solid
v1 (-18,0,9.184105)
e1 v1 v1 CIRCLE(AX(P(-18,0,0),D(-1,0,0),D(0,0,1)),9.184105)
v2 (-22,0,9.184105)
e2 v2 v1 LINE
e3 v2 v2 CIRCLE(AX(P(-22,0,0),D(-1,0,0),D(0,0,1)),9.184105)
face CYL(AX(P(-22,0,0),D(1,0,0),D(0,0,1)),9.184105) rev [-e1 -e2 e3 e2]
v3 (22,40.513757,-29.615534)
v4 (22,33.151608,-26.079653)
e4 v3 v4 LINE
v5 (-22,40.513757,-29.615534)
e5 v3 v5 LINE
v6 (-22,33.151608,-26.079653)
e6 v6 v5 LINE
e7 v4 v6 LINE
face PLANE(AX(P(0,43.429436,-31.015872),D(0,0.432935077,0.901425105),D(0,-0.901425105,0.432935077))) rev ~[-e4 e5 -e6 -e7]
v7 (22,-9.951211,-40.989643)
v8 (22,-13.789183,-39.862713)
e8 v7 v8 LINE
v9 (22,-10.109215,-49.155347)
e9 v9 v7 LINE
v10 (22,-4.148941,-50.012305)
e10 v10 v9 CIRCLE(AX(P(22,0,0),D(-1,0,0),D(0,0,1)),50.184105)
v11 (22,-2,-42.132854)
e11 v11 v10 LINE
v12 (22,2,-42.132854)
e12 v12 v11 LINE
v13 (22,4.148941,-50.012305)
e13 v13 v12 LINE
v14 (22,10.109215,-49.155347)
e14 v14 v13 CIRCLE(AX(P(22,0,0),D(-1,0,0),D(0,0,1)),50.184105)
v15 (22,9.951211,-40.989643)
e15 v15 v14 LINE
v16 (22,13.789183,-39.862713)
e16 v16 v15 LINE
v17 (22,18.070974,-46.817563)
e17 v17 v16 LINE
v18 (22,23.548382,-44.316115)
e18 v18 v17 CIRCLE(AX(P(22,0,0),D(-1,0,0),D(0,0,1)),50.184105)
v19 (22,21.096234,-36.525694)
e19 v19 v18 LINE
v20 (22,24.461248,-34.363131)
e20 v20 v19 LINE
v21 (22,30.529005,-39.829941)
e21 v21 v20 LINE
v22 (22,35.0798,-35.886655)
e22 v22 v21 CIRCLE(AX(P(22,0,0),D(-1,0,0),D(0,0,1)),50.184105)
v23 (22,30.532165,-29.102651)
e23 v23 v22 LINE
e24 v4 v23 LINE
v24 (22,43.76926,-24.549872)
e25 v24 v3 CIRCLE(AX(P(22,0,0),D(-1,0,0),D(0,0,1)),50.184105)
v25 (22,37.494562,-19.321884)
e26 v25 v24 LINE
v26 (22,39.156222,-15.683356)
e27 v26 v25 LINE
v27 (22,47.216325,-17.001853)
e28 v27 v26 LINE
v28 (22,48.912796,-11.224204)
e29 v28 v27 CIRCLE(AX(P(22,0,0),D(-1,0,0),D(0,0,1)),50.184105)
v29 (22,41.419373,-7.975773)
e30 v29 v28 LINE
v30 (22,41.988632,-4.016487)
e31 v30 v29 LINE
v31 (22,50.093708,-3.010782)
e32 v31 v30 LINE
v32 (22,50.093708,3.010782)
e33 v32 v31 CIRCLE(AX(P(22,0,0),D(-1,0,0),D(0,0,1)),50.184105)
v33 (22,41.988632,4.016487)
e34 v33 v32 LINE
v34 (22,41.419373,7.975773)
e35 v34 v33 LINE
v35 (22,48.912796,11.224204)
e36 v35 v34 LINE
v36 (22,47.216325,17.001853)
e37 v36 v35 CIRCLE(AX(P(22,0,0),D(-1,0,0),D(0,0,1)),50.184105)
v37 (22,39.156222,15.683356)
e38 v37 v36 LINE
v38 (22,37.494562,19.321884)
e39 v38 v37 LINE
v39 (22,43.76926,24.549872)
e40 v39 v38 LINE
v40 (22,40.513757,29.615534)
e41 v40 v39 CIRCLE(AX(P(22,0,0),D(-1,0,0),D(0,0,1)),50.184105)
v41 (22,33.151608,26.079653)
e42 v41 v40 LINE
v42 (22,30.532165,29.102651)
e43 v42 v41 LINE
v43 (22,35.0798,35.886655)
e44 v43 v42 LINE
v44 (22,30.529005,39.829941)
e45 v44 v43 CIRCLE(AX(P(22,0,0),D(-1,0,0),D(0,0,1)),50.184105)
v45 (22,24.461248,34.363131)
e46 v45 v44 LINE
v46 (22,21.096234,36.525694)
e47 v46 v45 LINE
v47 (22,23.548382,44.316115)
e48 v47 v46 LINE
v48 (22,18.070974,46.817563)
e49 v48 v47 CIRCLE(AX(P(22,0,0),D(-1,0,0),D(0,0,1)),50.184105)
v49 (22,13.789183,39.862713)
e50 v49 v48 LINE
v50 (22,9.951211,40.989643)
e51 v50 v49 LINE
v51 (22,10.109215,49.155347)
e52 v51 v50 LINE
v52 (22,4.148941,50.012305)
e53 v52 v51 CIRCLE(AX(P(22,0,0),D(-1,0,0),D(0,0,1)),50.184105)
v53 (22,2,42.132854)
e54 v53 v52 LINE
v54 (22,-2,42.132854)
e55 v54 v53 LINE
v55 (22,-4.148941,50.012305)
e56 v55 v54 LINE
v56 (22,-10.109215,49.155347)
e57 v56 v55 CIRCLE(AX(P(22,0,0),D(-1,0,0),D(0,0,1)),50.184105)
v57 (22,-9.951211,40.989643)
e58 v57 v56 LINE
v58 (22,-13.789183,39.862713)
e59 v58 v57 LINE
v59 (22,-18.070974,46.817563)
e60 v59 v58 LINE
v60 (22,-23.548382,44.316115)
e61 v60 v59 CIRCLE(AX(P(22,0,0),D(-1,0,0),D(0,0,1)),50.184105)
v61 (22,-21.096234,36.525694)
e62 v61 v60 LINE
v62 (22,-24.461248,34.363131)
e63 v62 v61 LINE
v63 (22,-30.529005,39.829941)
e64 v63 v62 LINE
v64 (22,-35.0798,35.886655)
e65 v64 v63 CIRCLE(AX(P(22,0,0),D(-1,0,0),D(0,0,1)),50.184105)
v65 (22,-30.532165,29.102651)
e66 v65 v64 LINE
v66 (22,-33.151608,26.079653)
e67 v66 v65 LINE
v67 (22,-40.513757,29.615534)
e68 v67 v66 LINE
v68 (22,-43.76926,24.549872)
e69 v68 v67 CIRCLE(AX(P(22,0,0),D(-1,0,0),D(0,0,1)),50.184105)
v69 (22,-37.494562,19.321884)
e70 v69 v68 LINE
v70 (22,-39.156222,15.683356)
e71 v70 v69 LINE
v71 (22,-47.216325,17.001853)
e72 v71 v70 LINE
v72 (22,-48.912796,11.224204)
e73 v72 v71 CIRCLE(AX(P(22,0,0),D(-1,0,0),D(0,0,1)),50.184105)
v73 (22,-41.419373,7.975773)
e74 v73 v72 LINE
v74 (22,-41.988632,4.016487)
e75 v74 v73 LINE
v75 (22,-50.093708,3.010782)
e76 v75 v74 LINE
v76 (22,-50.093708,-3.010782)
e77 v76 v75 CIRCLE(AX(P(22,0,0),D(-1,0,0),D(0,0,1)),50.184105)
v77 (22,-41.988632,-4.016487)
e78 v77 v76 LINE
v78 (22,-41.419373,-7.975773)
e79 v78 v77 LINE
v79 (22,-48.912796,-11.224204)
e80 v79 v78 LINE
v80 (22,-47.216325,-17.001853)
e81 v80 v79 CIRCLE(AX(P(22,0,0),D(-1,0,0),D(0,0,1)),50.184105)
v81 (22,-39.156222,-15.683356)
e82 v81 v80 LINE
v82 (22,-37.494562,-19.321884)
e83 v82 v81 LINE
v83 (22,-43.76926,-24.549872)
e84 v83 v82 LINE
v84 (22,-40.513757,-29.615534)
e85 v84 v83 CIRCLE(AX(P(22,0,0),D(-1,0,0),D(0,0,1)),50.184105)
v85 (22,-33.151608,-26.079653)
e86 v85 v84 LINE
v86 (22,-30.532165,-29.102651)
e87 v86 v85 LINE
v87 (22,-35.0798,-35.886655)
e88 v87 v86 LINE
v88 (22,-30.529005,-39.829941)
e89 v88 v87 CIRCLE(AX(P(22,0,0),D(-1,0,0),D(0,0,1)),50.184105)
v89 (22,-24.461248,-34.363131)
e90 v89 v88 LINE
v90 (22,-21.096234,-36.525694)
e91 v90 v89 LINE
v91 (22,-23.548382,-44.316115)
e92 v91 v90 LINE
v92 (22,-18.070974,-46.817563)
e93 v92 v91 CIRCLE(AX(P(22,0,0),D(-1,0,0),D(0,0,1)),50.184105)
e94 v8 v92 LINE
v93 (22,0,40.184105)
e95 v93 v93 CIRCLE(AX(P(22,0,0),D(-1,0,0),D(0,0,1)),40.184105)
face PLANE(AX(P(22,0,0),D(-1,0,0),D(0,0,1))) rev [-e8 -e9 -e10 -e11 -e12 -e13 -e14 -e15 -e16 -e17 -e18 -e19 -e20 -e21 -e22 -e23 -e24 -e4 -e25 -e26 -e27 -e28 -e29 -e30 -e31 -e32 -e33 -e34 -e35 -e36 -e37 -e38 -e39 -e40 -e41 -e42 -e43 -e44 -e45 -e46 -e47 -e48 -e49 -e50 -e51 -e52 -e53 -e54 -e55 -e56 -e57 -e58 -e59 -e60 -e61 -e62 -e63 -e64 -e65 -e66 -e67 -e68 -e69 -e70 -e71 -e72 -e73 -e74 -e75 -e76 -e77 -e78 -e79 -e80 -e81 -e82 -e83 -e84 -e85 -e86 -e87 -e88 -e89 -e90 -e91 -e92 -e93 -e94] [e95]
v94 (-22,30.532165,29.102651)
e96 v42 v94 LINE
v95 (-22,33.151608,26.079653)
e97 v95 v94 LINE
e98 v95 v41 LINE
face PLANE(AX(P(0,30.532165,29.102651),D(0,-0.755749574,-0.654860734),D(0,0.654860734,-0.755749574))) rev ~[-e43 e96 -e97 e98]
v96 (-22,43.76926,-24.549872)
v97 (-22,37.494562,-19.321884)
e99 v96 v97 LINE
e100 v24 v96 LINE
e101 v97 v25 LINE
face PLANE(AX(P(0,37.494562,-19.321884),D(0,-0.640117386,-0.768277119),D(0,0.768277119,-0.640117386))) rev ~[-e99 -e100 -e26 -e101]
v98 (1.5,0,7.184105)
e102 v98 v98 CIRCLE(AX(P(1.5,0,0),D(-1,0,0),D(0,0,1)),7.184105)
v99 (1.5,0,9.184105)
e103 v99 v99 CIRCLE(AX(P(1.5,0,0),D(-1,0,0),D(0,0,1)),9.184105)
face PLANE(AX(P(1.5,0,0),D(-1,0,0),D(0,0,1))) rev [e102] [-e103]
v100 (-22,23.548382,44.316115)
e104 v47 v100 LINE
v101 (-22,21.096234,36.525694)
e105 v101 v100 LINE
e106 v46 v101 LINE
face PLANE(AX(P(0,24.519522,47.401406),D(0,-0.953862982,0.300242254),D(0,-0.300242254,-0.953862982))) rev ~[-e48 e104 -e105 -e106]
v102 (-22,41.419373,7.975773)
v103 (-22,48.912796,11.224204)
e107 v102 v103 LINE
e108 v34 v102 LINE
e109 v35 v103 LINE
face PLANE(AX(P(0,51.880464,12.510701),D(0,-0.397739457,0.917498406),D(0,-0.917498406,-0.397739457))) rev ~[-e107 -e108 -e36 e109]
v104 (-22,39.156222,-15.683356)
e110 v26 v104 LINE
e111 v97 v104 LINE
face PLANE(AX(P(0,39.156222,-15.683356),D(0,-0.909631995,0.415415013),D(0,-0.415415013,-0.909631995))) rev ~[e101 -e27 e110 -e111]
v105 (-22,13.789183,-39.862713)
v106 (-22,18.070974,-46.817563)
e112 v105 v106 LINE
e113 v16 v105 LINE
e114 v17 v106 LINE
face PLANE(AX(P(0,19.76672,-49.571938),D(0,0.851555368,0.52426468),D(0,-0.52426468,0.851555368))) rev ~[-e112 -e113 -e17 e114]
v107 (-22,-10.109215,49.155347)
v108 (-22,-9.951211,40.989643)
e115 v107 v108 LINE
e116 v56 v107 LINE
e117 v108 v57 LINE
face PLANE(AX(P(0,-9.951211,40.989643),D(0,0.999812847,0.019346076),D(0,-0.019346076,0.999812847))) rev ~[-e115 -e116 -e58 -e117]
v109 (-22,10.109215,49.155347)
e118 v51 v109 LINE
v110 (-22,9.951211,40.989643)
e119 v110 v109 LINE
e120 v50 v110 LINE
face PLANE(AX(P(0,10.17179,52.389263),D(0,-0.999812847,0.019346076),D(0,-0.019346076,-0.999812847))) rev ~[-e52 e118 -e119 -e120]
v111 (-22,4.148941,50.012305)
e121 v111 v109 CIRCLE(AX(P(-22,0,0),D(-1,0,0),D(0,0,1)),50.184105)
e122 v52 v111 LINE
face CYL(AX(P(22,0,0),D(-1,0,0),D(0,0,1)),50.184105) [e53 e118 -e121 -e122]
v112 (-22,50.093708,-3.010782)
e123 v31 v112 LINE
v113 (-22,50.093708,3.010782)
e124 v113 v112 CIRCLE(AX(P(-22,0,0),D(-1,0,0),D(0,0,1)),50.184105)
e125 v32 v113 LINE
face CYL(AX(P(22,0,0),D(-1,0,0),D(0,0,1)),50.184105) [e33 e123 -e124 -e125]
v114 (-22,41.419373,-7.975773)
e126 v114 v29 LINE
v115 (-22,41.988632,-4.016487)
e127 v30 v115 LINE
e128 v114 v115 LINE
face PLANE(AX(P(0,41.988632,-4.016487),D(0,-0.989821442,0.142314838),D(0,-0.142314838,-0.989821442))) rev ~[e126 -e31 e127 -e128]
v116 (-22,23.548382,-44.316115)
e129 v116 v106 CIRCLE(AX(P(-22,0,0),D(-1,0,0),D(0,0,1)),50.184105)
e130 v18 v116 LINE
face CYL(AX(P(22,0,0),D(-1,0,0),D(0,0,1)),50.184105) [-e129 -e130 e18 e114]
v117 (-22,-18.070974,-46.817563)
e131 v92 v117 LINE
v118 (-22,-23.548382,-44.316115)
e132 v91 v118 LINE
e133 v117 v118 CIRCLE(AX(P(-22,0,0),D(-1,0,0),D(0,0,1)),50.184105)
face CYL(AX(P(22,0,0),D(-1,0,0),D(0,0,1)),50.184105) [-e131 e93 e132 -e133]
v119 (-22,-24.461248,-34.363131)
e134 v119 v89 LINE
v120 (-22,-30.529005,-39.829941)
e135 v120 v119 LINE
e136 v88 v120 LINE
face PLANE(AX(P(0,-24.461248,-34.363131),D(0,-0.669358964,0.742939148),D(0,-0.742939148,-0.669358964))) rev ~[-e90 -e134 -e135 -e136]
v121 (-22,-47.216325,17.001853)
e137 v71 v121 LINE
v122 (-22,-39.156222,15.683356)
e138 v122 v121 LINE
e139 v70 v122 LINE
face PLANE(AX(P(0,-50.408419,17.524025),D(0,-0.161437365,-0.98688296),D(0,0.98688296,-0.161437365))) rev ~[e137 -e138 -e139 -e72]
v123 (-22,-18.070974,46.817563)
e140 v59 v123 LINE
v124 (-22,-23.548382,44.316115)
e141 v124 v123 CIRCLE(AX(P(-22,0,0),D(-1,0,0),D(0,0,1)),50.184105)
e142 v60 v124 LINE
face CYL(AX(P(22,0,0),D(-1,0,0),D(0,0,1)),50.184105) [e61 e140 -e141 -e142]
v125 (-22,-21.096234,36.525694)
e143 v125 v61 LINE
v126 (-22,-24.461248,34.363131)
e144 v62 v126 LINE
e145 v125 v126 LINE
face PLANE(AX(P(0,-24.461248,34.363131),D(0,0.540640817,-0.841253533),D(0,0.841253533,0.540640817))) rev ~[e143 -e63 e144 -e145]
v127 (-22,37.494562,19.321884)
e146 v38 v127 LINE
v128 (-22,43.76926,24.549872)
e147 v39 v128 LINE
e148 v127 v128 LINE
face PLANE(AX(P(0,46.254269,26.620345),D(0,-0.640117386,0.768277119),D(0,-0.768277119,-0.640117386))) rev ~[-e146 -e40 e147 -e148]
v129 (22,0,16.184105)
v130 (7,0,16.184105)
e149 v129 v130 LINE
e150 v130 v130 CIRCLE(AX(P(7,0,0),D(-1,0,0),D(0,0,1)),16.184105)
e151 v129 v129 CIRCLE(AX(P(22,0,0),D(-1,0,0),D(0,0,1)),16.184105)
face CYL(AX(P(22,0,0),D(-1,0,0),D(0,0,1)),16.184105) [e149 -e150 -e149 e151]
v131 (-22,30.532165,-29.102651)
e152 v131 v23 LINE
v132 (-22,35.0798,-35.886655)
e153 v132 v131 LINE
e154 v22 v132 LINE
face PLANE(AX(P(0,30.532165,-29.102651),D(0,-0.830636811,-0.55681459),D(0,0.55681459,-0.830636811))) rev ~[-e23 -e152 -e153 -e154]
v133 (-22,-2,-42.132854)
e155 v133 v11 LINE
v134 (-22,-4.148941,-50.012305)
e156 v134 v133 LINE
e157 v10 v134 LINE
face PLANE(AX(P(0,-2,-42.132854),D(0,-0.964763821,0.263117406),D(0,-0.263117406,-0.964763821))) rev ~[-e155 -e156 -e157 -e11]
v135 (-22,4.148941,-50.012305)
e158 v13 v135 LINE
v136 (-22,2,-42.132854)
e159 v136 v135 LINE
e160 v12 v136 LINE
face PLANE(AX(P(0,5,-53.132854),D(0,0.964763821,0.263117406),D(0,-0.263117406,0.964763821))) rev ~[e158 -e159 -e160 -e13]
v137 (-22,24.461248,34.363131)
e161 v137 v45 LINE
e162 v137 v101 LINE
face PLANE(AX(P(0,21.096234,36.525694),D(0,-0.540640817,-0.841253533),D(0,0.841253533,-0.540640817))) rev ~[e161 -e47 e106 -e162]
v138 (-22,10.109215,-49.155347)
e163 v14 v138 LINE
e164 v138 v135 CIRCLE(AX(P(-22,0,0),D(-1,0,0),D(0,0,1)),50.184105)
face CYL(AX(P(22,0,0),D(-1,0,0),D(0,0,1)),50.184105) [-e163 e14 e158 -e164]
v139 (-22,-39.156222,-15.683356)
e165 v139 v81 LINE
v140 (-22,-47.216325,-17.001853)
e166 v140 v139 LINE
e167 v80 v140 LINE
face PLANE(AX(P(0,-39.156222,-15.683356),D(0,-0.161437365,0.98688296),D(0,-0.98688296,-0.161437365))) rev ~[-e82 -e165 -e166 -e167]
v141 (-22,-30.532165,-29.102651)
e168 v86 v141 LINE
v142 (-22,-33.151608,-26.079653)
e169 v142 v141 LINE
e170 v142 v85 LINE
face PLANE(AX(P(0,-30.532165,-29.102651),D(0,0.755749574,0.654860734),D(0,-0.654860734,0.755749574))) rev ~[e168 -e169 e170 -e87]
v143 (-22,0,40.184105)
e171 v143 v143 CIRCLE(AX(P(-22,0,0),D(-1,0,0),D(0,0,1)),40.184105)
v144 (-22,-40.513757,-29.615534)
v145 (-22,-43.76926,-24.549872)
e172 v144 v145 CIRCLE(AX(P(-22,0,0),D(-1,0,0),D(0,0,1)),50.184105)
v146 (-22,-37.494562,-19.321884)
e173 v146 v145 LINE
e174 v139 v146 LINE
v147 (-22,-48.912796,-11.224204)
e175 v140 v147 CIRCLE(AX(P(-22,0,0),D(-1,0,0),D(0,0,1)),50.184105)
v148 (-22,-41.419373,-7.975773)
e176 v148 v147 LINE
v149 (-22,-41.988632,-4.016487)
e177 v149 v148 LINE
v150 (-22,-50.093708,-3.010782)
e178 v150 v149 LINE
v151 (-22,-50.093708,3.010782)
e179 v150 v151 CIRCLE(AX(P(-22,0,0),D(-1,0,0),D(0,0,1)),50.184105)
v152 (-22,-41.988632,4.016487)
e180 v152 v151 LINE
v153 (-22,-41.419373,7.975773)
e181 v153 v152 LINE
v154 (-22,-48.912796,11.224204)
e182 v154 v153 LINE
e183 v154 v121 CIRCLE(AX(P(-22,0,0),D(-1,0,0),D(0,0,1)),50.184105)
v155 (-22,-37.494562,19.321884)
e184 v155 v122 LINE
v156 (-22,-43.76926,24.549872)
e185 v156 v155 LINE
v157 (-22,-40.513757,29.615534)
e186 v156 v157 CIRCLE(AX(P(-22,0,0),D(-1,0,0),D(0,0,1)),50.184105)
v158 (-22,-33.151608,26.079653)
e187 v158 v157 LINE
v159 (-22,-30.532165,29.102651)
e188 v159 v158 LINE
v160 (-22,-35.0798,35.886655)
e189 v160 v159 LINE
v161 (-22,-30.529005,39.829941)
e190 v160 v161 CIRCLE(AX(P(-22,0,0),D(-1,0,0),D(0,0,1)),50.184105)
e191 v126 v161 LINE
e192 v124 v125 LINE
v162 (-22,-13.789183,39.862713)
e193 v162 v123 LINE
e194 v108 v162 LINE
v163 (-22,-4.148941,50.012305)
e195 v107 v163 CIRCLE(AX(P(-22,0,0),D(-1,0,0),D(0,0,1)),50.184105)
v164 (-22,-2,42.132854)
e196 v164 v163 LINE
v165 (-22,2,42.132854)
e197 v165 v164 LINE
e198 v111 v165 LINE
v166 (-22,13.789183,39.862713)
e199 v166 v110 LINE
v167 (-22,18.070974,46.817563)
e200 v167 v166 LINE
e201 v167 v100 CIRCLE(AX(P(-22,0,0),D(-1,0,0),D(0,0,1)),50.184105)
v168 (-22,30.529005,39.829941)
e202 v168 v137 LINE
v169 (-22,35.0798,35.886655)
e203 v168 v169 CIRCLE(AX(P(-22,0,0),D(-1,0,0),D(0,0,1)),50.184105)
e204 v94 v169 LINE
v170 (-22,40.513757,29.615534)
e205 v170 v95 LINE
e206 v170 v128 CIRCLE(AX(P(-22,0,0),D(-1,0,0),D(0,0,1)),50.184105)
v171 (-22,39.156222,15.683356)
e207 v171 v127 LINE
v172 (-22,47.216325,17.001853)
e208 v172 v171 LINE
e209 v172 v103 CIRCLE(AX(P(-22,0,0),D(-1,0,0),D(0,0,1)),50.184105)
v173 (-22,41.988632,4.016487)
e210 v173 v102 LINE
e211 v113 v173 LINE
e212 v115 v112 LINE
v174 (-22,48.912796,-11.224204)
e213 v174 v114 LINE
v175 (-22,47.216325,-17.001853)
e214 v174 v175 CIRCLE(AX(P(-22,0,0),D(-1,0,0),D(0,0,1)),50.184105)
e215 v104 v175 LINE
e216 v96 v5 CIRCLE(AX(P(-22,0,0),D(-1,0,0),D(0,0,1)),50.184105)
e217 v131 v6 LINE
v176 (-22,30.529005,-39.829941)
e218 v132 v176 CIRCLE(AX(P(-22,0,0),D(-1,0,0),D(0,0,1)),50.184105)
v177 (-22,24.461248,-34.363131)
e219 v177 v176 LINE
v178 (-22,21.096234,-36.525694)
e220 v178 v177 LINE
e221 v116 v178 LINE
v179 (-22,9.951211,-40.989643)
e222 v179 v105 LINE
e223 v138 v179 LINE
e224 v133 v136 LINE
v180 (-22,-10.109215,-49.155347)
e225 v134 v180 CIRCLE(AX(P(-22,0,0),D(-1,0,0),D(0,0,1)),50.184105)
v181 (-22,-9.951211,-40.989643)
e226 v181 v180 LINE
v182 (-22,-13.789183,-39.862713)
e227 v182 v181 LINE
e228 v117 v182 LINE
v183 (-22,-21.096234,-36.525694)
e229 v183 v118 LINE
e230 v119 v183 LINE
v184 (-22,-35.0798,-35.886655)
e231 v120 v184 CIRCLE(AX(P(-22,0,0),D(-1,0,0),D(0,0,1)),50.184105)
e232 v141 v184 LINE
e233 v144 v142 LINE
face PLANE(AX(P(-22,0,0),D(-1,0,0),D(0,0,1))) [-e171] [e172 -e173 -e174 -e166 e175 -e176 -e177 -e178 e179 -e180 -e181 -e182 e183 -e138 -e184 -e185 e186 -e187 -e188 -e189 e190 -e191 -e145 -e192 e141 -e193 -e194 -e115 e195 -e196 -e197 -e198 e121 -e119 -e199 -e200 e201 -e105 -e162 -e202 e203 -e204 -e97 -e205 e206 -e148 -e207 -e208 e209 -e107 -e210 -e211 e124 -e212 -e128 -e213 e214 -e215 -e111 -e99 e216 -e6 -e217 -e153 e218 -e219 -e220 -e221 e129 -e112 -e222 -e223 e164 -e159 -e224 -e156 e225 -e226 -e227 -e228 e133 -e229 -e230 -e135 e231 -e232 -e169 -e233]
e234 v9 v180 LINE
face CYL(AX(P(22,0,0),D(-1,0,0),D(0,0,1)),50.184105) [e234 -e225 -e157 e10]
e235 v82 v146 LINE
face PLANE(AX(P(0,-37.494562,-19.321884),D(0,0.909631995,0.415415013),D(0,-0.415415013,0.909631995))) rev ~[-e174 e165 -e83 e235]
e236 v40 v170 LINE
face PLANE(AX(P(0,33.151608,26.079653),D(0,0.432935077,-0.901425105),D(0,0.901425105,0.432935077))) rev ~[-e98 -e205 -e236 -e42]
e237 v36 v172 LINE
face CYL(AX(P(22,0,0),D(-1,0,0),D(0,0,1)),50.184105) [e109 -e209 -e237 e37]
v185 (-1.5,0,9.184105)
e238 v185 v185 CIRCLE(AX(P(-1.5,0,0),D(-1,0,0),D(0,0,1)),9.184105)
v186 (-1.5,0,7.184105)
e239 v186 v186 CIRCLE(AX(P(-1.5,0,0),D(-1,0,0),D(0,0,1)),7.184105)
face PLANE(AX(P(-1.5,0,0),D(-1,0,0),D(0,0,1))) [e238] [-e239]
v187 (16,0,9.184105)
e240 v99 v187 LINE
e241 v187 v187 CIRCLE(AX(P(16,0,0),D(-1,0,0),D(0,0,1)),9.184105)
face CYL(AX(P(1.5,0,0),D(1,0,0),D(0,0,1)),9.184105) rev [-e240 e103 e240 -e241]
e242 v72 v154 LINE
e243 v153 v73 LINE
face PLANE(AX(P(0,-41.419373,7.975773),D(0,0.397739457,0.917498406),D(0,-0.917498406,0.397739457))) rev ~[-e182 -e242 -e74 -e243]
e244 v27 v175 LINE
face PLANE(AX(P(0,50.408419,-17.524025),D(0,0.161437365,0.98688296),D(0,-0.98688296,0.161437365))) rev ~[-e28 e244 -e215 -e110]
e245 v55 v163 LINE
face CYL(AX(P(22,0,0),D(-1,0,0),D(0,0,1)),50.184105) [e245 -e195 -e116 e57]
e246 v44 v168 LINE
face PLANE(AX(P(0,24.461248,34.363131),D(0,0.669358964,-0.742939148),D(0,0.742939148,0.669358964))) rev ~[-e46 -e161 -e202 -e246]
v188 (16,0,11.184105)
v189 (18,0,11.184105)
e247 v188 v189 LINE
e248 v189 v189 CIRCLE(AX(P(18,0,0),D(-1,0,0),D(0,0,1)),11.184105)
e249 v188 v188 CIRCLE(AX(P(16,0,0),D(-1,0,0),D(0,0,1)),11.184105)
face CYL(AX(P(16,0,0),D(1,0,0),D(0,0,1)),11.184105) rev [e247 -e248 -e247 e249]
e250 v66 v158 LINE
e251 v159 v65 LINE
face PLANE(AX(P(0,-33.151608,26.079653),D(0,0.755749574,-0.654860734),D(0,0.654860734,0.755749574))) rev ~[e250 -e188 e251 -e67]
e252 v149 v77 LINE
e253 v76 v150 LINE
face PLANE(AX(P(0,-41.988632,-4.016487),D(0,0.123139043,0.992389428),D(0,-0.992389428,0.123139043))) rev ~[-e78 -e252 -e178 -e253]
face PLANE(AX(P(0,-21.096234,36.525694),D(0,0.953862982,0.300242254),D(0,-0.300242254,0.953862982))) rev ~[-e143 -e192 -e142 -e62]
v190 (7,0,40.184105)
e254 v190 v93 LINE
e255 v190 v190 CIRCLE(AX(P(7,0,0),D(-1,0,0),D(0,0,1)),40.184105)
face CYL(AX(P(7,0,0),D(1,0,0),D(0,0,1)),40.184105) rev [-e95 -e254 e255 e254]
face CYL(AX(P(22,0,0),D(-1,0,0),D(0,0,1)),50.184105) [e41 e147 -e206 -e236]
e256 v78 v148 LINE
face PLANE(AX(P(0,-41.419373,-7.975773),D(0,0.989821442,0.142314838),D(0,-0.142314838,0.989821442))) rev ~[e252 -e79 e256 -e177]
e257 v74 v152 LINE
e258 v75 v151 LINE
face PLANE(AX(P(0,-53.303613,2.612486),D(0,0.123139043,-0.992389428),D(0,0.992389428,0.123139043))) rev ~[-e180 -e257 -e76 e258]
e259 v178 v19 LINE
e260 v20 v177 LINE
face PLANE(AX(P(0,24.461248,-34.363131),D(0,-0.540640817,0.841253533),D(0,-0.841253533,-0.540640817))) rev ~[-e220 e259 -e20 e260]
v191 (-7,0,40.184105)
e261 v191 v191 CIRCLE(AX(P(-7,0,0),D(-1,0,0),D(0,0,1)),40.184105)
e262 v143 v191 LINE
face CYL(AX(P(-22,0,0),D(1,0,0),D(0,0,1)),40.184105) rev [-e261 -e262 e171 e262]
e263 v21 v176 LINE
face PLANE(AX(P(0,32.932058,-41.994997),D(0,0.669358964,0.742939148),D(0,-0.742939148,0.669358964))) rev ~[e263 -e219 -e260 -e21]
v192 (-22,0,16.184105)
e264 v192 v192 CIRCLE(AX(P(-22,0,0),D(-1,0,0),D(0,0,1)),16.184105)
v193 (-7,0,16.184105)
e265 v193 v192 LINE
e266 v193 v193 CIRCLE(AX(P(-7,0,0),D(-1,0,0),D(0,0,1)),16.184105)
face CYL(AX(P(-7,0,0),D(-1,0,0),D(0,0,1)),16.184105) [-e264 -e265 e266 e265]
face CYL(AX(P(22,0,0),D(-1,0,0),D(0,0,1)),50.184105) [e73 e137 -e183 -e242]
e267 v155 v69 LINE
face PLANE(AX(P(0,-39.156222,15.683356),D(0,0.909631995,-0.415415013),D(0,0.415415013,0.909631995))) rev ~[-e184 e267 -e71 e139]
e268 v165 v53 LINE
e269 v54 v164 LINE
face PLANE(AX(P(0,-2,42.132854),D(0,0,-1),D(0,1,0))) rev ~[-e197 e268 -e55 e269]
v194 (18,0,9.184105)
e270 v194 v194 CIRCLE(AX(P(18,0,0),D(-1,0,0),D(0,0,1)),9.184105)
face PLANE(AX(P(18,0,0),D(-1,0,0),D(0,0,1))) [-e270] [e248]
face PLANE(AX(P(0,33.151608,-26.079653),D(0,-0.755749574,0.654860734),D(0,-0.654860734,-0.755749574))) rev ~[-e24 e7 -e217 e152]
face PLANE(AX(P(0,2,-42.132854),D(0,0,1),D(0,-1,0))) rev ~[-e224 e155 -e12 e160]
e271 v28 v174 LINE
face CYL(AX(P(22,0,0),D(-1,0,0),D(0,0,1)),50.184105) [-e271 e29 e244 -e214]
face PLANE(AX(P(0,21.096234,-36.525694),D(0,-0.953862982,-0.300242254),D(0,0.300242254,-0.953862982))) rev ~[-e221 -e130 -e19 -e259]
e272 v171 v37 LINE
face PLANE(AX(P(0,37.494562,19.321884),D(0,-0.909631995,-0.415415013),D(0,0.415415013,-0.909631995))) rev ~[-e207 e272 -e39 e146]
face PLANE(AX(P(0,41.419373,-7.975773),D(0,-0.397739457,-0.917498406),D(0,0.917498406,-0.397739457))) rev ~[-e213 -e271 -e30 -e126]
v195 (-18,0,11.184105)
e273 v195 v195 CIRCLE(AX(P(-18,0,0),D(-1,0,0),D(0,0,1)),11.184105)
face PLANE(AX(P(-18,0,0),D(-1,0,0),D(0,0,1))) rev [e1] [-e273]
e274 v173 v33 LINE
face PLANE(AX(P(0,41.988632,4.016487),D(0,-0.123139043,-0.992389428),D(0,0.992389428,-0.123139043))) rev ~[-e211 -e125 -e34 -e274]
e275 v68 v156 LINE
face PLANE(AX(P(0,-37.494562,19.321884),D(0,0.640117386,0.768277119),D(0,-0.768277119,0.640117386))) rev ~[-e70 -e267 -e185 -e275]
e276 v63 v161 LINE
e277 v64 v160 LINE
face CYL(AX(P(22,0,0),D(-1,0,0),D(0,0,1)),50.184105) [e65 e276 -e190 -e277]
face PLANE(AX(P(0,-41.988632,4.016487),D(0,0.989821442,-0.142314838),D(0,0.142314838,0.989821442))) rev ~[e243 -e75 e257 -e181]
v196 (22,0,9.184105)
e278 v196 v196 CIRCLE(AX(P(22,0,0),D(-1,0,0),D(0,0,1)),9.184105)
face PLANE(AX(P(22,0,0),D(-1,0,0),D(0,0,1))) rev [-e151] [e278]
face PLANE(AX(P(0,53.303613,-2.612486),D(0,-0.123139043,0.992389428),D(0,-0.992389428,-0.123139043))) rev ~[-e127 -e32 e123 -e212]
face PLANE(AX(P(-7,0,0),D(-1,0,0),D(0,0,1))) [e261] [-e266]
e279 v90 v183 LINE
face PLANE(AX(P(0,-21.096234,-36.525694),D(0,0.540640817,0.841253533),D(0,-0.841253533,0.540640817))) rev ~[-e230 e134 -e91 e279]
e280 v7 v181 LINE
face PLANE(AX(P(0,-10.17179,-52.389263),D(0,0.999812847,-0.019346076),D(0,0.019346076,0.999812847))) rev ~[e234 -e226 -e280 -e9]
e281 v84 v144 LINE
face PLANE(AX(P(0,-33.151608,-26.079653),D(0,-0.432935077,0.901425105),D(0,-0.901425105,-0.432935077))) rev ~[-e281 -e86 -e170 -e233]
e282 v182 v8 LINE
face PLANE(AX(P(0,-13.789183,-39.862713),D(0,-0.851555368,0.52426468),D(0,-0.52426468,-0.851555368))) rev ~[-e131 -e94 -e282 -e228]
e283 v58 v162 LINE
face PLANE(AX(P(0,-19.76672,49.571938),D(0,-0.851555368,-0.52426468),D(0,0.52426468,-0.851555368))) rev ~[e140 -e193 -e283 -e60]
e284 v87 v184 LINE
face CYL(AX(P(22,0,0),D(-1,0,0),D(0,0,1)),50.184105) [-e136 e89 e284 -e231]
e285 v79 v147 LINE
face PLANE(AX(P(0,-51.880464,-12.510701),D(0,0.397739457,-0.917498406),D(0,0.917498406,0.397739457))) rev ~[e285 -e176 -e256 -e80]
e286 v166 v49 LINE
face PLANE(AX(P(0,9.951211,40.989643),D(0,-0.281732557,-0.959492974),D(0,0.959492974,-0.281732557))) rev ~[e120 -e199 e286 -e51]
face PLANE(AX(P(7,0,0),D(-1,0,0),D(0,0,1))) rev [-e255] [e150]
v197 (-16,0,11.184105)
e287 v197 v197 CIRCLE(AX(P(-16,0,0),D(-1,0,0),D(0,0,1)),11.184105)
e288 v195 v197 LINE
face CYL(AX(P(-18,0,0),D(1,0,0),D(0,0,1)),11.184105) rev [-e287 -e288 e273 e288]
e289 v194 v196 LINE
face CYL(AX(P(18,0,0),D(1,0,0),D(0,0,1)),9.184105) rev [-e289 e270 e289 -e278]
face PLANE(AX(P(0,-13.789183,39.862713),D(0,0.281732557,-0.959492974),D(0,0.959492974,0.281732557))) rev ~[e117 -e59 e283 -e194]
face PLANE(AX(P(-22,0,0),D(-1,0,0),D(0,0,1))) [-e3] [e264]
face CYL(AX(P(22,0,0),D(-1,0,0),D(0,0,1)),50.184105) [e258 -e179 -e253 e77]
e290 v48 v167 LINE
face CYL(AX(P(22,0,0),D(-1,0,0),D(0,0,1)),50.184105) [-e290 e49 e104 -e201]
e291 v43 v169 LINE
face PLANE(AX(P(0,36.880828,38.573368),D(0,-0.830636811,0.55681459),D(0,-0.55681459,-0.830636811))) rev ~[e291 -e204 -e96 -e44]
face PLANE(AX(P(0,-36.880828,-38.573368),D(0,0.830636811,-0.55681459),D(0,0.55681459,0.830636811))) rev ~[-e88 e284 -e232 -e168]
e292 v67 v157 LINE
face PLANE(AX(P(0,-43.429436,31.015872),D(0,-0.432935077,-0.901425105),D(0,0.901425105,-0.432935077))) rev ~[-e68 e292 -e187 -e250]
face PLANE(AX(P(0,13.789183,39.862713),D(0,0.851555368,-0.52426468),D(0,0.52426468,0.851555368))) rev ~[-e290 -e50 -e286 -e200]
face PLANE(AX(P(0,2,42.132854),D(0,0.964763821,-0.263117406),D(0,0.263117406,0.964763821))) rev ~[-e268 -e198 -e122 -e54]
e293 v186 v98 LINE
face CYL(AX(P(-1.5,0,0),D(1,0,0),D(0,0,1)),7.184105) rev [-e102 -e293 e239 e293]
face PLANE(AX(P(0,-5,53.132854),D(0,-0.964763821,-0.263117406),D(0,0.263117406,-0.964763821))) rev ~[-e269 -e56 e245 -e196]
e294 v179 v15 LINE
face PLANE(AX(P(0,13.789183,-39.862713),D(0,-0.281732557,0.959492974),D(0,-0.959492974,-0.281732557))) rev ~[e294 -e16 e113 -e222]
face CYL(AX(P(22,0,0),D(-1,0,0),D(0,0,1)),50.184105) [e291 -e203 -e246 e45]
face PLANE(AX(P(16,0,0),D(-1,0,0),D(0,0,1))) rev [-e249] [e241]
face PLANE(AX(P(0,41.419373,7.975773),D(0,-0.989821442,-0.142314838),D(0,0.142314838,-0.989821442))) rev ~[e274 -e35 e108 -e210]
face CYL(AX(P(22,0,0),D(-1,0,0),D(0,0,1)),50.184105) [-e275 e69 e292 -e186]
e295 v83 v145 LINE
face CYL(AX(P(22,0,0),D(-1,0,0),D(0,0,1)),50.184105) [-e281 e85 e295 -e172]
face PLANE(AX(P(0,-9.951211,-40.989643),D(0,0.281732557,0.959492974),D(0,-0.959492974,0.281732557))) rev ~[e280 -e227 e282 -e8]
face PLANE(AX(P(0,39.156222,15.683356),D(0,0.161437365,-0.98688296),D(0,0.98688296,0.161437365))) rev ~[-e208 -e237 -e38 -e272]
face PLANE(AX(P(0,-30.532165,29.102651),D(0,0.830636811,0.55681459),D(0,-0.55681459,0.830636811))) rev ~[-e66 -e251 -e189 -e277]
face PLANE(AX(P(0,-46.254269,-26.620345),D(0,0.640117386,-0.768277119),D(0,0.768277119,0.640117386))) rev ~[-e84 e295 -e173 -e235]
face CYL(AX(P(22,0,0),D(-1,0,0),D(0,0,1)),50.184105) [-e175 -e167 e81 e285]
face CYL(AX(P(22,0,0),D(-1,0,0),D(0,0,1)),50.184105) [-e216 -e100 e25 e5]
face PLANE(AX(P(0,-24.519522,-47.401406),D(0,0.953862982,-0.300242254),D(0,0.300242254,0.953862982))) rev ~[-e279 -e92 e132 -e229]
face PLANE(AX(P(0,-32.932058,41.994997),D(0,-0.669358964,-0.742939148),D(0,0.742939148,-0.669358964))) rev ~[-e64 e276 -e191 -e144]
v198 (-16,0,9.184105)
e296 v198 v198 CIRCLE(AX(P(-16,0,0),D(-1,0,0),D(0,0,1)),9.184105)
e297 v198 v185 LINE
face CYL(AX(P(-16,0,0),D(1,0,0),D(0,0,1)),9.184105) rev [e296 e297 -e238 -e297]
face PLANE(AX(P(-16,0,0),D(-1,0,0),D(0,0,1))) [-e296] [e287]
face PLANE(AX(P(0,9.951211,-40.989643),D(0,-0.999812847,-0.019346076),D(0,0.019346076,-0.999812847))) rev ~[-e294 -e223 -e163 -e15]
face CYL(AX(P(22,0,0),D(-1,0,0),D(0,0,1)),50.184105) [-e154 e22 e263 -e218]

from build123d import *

# Parameters (mm, degrees)
F3_DEPTH        = 48.6
F3_COPIES_COUNT = 22


# Not quite as in the source:
# - a pattern or mirror of a feature is missing from the dataset's text; its kind, count and spacing are read off the source's solid


with BuildPart() as f1:
    # F0 (on Front) → F1 (revolve)
    with BuildSketch(Plane.XZ):
        Polygon((22, 50.1841045916), (0, 50.1841045916), (-22, 50.1841045916), (-22, 40.1841045916), (-7, 40.1841045916), (-7, 16.1841045916), (-22, 16.1841045916), (-22, 9.1841045916), (-18, 9.1841045916), (-18, 11.1841045916), (-16, 11.1841045916), (-16, 9.1841045916), (-1.5, 9.1841045916), (-1.5, 7.1841045916), (0, 7.1841045916), (1.5, 7.1841045916), (1.5, 9.1841045916), (16, 9.1841045916), (16, 11.1841045916), (18, 11.1841045916), (18, 9.1841045916), (22, 9.1841045916), (22, 16.1841045916), (7, 16.1841045916), (7, 40.1841045916), (22, 40.1841045916), align=None)
    revolve(axis=Axis((-7.0416135713, 0, 0), (-1, 0, 0)))

    # F2 (on Right) → F3 (cut, symmetric)
    with BuildSketch(Plane.YZ):
        Polygon((-2, 42.1328544021), (0, 42.1328544021), (2, 42.1328544021), (5, 53.1328544021), (0, 53.1328544021), (-5, 53.1328544021), align=None)
    f3 = extrude(amount=F3_DEPTH, both=True, mode=Mode.SUBTRACT)

    # F3_copies: F3 ×22 about axis
    f3_copies_axis = Axis((0, 0, 0), (1, 0, 0))
    for i in range(1, F3_COPIES_COUNT):
        add(f3.rotate(f3_copies_axis, i * 360 / F3_COPIES_COUNT), mode=Mode.SUBTRACT)


solid = f1.part
